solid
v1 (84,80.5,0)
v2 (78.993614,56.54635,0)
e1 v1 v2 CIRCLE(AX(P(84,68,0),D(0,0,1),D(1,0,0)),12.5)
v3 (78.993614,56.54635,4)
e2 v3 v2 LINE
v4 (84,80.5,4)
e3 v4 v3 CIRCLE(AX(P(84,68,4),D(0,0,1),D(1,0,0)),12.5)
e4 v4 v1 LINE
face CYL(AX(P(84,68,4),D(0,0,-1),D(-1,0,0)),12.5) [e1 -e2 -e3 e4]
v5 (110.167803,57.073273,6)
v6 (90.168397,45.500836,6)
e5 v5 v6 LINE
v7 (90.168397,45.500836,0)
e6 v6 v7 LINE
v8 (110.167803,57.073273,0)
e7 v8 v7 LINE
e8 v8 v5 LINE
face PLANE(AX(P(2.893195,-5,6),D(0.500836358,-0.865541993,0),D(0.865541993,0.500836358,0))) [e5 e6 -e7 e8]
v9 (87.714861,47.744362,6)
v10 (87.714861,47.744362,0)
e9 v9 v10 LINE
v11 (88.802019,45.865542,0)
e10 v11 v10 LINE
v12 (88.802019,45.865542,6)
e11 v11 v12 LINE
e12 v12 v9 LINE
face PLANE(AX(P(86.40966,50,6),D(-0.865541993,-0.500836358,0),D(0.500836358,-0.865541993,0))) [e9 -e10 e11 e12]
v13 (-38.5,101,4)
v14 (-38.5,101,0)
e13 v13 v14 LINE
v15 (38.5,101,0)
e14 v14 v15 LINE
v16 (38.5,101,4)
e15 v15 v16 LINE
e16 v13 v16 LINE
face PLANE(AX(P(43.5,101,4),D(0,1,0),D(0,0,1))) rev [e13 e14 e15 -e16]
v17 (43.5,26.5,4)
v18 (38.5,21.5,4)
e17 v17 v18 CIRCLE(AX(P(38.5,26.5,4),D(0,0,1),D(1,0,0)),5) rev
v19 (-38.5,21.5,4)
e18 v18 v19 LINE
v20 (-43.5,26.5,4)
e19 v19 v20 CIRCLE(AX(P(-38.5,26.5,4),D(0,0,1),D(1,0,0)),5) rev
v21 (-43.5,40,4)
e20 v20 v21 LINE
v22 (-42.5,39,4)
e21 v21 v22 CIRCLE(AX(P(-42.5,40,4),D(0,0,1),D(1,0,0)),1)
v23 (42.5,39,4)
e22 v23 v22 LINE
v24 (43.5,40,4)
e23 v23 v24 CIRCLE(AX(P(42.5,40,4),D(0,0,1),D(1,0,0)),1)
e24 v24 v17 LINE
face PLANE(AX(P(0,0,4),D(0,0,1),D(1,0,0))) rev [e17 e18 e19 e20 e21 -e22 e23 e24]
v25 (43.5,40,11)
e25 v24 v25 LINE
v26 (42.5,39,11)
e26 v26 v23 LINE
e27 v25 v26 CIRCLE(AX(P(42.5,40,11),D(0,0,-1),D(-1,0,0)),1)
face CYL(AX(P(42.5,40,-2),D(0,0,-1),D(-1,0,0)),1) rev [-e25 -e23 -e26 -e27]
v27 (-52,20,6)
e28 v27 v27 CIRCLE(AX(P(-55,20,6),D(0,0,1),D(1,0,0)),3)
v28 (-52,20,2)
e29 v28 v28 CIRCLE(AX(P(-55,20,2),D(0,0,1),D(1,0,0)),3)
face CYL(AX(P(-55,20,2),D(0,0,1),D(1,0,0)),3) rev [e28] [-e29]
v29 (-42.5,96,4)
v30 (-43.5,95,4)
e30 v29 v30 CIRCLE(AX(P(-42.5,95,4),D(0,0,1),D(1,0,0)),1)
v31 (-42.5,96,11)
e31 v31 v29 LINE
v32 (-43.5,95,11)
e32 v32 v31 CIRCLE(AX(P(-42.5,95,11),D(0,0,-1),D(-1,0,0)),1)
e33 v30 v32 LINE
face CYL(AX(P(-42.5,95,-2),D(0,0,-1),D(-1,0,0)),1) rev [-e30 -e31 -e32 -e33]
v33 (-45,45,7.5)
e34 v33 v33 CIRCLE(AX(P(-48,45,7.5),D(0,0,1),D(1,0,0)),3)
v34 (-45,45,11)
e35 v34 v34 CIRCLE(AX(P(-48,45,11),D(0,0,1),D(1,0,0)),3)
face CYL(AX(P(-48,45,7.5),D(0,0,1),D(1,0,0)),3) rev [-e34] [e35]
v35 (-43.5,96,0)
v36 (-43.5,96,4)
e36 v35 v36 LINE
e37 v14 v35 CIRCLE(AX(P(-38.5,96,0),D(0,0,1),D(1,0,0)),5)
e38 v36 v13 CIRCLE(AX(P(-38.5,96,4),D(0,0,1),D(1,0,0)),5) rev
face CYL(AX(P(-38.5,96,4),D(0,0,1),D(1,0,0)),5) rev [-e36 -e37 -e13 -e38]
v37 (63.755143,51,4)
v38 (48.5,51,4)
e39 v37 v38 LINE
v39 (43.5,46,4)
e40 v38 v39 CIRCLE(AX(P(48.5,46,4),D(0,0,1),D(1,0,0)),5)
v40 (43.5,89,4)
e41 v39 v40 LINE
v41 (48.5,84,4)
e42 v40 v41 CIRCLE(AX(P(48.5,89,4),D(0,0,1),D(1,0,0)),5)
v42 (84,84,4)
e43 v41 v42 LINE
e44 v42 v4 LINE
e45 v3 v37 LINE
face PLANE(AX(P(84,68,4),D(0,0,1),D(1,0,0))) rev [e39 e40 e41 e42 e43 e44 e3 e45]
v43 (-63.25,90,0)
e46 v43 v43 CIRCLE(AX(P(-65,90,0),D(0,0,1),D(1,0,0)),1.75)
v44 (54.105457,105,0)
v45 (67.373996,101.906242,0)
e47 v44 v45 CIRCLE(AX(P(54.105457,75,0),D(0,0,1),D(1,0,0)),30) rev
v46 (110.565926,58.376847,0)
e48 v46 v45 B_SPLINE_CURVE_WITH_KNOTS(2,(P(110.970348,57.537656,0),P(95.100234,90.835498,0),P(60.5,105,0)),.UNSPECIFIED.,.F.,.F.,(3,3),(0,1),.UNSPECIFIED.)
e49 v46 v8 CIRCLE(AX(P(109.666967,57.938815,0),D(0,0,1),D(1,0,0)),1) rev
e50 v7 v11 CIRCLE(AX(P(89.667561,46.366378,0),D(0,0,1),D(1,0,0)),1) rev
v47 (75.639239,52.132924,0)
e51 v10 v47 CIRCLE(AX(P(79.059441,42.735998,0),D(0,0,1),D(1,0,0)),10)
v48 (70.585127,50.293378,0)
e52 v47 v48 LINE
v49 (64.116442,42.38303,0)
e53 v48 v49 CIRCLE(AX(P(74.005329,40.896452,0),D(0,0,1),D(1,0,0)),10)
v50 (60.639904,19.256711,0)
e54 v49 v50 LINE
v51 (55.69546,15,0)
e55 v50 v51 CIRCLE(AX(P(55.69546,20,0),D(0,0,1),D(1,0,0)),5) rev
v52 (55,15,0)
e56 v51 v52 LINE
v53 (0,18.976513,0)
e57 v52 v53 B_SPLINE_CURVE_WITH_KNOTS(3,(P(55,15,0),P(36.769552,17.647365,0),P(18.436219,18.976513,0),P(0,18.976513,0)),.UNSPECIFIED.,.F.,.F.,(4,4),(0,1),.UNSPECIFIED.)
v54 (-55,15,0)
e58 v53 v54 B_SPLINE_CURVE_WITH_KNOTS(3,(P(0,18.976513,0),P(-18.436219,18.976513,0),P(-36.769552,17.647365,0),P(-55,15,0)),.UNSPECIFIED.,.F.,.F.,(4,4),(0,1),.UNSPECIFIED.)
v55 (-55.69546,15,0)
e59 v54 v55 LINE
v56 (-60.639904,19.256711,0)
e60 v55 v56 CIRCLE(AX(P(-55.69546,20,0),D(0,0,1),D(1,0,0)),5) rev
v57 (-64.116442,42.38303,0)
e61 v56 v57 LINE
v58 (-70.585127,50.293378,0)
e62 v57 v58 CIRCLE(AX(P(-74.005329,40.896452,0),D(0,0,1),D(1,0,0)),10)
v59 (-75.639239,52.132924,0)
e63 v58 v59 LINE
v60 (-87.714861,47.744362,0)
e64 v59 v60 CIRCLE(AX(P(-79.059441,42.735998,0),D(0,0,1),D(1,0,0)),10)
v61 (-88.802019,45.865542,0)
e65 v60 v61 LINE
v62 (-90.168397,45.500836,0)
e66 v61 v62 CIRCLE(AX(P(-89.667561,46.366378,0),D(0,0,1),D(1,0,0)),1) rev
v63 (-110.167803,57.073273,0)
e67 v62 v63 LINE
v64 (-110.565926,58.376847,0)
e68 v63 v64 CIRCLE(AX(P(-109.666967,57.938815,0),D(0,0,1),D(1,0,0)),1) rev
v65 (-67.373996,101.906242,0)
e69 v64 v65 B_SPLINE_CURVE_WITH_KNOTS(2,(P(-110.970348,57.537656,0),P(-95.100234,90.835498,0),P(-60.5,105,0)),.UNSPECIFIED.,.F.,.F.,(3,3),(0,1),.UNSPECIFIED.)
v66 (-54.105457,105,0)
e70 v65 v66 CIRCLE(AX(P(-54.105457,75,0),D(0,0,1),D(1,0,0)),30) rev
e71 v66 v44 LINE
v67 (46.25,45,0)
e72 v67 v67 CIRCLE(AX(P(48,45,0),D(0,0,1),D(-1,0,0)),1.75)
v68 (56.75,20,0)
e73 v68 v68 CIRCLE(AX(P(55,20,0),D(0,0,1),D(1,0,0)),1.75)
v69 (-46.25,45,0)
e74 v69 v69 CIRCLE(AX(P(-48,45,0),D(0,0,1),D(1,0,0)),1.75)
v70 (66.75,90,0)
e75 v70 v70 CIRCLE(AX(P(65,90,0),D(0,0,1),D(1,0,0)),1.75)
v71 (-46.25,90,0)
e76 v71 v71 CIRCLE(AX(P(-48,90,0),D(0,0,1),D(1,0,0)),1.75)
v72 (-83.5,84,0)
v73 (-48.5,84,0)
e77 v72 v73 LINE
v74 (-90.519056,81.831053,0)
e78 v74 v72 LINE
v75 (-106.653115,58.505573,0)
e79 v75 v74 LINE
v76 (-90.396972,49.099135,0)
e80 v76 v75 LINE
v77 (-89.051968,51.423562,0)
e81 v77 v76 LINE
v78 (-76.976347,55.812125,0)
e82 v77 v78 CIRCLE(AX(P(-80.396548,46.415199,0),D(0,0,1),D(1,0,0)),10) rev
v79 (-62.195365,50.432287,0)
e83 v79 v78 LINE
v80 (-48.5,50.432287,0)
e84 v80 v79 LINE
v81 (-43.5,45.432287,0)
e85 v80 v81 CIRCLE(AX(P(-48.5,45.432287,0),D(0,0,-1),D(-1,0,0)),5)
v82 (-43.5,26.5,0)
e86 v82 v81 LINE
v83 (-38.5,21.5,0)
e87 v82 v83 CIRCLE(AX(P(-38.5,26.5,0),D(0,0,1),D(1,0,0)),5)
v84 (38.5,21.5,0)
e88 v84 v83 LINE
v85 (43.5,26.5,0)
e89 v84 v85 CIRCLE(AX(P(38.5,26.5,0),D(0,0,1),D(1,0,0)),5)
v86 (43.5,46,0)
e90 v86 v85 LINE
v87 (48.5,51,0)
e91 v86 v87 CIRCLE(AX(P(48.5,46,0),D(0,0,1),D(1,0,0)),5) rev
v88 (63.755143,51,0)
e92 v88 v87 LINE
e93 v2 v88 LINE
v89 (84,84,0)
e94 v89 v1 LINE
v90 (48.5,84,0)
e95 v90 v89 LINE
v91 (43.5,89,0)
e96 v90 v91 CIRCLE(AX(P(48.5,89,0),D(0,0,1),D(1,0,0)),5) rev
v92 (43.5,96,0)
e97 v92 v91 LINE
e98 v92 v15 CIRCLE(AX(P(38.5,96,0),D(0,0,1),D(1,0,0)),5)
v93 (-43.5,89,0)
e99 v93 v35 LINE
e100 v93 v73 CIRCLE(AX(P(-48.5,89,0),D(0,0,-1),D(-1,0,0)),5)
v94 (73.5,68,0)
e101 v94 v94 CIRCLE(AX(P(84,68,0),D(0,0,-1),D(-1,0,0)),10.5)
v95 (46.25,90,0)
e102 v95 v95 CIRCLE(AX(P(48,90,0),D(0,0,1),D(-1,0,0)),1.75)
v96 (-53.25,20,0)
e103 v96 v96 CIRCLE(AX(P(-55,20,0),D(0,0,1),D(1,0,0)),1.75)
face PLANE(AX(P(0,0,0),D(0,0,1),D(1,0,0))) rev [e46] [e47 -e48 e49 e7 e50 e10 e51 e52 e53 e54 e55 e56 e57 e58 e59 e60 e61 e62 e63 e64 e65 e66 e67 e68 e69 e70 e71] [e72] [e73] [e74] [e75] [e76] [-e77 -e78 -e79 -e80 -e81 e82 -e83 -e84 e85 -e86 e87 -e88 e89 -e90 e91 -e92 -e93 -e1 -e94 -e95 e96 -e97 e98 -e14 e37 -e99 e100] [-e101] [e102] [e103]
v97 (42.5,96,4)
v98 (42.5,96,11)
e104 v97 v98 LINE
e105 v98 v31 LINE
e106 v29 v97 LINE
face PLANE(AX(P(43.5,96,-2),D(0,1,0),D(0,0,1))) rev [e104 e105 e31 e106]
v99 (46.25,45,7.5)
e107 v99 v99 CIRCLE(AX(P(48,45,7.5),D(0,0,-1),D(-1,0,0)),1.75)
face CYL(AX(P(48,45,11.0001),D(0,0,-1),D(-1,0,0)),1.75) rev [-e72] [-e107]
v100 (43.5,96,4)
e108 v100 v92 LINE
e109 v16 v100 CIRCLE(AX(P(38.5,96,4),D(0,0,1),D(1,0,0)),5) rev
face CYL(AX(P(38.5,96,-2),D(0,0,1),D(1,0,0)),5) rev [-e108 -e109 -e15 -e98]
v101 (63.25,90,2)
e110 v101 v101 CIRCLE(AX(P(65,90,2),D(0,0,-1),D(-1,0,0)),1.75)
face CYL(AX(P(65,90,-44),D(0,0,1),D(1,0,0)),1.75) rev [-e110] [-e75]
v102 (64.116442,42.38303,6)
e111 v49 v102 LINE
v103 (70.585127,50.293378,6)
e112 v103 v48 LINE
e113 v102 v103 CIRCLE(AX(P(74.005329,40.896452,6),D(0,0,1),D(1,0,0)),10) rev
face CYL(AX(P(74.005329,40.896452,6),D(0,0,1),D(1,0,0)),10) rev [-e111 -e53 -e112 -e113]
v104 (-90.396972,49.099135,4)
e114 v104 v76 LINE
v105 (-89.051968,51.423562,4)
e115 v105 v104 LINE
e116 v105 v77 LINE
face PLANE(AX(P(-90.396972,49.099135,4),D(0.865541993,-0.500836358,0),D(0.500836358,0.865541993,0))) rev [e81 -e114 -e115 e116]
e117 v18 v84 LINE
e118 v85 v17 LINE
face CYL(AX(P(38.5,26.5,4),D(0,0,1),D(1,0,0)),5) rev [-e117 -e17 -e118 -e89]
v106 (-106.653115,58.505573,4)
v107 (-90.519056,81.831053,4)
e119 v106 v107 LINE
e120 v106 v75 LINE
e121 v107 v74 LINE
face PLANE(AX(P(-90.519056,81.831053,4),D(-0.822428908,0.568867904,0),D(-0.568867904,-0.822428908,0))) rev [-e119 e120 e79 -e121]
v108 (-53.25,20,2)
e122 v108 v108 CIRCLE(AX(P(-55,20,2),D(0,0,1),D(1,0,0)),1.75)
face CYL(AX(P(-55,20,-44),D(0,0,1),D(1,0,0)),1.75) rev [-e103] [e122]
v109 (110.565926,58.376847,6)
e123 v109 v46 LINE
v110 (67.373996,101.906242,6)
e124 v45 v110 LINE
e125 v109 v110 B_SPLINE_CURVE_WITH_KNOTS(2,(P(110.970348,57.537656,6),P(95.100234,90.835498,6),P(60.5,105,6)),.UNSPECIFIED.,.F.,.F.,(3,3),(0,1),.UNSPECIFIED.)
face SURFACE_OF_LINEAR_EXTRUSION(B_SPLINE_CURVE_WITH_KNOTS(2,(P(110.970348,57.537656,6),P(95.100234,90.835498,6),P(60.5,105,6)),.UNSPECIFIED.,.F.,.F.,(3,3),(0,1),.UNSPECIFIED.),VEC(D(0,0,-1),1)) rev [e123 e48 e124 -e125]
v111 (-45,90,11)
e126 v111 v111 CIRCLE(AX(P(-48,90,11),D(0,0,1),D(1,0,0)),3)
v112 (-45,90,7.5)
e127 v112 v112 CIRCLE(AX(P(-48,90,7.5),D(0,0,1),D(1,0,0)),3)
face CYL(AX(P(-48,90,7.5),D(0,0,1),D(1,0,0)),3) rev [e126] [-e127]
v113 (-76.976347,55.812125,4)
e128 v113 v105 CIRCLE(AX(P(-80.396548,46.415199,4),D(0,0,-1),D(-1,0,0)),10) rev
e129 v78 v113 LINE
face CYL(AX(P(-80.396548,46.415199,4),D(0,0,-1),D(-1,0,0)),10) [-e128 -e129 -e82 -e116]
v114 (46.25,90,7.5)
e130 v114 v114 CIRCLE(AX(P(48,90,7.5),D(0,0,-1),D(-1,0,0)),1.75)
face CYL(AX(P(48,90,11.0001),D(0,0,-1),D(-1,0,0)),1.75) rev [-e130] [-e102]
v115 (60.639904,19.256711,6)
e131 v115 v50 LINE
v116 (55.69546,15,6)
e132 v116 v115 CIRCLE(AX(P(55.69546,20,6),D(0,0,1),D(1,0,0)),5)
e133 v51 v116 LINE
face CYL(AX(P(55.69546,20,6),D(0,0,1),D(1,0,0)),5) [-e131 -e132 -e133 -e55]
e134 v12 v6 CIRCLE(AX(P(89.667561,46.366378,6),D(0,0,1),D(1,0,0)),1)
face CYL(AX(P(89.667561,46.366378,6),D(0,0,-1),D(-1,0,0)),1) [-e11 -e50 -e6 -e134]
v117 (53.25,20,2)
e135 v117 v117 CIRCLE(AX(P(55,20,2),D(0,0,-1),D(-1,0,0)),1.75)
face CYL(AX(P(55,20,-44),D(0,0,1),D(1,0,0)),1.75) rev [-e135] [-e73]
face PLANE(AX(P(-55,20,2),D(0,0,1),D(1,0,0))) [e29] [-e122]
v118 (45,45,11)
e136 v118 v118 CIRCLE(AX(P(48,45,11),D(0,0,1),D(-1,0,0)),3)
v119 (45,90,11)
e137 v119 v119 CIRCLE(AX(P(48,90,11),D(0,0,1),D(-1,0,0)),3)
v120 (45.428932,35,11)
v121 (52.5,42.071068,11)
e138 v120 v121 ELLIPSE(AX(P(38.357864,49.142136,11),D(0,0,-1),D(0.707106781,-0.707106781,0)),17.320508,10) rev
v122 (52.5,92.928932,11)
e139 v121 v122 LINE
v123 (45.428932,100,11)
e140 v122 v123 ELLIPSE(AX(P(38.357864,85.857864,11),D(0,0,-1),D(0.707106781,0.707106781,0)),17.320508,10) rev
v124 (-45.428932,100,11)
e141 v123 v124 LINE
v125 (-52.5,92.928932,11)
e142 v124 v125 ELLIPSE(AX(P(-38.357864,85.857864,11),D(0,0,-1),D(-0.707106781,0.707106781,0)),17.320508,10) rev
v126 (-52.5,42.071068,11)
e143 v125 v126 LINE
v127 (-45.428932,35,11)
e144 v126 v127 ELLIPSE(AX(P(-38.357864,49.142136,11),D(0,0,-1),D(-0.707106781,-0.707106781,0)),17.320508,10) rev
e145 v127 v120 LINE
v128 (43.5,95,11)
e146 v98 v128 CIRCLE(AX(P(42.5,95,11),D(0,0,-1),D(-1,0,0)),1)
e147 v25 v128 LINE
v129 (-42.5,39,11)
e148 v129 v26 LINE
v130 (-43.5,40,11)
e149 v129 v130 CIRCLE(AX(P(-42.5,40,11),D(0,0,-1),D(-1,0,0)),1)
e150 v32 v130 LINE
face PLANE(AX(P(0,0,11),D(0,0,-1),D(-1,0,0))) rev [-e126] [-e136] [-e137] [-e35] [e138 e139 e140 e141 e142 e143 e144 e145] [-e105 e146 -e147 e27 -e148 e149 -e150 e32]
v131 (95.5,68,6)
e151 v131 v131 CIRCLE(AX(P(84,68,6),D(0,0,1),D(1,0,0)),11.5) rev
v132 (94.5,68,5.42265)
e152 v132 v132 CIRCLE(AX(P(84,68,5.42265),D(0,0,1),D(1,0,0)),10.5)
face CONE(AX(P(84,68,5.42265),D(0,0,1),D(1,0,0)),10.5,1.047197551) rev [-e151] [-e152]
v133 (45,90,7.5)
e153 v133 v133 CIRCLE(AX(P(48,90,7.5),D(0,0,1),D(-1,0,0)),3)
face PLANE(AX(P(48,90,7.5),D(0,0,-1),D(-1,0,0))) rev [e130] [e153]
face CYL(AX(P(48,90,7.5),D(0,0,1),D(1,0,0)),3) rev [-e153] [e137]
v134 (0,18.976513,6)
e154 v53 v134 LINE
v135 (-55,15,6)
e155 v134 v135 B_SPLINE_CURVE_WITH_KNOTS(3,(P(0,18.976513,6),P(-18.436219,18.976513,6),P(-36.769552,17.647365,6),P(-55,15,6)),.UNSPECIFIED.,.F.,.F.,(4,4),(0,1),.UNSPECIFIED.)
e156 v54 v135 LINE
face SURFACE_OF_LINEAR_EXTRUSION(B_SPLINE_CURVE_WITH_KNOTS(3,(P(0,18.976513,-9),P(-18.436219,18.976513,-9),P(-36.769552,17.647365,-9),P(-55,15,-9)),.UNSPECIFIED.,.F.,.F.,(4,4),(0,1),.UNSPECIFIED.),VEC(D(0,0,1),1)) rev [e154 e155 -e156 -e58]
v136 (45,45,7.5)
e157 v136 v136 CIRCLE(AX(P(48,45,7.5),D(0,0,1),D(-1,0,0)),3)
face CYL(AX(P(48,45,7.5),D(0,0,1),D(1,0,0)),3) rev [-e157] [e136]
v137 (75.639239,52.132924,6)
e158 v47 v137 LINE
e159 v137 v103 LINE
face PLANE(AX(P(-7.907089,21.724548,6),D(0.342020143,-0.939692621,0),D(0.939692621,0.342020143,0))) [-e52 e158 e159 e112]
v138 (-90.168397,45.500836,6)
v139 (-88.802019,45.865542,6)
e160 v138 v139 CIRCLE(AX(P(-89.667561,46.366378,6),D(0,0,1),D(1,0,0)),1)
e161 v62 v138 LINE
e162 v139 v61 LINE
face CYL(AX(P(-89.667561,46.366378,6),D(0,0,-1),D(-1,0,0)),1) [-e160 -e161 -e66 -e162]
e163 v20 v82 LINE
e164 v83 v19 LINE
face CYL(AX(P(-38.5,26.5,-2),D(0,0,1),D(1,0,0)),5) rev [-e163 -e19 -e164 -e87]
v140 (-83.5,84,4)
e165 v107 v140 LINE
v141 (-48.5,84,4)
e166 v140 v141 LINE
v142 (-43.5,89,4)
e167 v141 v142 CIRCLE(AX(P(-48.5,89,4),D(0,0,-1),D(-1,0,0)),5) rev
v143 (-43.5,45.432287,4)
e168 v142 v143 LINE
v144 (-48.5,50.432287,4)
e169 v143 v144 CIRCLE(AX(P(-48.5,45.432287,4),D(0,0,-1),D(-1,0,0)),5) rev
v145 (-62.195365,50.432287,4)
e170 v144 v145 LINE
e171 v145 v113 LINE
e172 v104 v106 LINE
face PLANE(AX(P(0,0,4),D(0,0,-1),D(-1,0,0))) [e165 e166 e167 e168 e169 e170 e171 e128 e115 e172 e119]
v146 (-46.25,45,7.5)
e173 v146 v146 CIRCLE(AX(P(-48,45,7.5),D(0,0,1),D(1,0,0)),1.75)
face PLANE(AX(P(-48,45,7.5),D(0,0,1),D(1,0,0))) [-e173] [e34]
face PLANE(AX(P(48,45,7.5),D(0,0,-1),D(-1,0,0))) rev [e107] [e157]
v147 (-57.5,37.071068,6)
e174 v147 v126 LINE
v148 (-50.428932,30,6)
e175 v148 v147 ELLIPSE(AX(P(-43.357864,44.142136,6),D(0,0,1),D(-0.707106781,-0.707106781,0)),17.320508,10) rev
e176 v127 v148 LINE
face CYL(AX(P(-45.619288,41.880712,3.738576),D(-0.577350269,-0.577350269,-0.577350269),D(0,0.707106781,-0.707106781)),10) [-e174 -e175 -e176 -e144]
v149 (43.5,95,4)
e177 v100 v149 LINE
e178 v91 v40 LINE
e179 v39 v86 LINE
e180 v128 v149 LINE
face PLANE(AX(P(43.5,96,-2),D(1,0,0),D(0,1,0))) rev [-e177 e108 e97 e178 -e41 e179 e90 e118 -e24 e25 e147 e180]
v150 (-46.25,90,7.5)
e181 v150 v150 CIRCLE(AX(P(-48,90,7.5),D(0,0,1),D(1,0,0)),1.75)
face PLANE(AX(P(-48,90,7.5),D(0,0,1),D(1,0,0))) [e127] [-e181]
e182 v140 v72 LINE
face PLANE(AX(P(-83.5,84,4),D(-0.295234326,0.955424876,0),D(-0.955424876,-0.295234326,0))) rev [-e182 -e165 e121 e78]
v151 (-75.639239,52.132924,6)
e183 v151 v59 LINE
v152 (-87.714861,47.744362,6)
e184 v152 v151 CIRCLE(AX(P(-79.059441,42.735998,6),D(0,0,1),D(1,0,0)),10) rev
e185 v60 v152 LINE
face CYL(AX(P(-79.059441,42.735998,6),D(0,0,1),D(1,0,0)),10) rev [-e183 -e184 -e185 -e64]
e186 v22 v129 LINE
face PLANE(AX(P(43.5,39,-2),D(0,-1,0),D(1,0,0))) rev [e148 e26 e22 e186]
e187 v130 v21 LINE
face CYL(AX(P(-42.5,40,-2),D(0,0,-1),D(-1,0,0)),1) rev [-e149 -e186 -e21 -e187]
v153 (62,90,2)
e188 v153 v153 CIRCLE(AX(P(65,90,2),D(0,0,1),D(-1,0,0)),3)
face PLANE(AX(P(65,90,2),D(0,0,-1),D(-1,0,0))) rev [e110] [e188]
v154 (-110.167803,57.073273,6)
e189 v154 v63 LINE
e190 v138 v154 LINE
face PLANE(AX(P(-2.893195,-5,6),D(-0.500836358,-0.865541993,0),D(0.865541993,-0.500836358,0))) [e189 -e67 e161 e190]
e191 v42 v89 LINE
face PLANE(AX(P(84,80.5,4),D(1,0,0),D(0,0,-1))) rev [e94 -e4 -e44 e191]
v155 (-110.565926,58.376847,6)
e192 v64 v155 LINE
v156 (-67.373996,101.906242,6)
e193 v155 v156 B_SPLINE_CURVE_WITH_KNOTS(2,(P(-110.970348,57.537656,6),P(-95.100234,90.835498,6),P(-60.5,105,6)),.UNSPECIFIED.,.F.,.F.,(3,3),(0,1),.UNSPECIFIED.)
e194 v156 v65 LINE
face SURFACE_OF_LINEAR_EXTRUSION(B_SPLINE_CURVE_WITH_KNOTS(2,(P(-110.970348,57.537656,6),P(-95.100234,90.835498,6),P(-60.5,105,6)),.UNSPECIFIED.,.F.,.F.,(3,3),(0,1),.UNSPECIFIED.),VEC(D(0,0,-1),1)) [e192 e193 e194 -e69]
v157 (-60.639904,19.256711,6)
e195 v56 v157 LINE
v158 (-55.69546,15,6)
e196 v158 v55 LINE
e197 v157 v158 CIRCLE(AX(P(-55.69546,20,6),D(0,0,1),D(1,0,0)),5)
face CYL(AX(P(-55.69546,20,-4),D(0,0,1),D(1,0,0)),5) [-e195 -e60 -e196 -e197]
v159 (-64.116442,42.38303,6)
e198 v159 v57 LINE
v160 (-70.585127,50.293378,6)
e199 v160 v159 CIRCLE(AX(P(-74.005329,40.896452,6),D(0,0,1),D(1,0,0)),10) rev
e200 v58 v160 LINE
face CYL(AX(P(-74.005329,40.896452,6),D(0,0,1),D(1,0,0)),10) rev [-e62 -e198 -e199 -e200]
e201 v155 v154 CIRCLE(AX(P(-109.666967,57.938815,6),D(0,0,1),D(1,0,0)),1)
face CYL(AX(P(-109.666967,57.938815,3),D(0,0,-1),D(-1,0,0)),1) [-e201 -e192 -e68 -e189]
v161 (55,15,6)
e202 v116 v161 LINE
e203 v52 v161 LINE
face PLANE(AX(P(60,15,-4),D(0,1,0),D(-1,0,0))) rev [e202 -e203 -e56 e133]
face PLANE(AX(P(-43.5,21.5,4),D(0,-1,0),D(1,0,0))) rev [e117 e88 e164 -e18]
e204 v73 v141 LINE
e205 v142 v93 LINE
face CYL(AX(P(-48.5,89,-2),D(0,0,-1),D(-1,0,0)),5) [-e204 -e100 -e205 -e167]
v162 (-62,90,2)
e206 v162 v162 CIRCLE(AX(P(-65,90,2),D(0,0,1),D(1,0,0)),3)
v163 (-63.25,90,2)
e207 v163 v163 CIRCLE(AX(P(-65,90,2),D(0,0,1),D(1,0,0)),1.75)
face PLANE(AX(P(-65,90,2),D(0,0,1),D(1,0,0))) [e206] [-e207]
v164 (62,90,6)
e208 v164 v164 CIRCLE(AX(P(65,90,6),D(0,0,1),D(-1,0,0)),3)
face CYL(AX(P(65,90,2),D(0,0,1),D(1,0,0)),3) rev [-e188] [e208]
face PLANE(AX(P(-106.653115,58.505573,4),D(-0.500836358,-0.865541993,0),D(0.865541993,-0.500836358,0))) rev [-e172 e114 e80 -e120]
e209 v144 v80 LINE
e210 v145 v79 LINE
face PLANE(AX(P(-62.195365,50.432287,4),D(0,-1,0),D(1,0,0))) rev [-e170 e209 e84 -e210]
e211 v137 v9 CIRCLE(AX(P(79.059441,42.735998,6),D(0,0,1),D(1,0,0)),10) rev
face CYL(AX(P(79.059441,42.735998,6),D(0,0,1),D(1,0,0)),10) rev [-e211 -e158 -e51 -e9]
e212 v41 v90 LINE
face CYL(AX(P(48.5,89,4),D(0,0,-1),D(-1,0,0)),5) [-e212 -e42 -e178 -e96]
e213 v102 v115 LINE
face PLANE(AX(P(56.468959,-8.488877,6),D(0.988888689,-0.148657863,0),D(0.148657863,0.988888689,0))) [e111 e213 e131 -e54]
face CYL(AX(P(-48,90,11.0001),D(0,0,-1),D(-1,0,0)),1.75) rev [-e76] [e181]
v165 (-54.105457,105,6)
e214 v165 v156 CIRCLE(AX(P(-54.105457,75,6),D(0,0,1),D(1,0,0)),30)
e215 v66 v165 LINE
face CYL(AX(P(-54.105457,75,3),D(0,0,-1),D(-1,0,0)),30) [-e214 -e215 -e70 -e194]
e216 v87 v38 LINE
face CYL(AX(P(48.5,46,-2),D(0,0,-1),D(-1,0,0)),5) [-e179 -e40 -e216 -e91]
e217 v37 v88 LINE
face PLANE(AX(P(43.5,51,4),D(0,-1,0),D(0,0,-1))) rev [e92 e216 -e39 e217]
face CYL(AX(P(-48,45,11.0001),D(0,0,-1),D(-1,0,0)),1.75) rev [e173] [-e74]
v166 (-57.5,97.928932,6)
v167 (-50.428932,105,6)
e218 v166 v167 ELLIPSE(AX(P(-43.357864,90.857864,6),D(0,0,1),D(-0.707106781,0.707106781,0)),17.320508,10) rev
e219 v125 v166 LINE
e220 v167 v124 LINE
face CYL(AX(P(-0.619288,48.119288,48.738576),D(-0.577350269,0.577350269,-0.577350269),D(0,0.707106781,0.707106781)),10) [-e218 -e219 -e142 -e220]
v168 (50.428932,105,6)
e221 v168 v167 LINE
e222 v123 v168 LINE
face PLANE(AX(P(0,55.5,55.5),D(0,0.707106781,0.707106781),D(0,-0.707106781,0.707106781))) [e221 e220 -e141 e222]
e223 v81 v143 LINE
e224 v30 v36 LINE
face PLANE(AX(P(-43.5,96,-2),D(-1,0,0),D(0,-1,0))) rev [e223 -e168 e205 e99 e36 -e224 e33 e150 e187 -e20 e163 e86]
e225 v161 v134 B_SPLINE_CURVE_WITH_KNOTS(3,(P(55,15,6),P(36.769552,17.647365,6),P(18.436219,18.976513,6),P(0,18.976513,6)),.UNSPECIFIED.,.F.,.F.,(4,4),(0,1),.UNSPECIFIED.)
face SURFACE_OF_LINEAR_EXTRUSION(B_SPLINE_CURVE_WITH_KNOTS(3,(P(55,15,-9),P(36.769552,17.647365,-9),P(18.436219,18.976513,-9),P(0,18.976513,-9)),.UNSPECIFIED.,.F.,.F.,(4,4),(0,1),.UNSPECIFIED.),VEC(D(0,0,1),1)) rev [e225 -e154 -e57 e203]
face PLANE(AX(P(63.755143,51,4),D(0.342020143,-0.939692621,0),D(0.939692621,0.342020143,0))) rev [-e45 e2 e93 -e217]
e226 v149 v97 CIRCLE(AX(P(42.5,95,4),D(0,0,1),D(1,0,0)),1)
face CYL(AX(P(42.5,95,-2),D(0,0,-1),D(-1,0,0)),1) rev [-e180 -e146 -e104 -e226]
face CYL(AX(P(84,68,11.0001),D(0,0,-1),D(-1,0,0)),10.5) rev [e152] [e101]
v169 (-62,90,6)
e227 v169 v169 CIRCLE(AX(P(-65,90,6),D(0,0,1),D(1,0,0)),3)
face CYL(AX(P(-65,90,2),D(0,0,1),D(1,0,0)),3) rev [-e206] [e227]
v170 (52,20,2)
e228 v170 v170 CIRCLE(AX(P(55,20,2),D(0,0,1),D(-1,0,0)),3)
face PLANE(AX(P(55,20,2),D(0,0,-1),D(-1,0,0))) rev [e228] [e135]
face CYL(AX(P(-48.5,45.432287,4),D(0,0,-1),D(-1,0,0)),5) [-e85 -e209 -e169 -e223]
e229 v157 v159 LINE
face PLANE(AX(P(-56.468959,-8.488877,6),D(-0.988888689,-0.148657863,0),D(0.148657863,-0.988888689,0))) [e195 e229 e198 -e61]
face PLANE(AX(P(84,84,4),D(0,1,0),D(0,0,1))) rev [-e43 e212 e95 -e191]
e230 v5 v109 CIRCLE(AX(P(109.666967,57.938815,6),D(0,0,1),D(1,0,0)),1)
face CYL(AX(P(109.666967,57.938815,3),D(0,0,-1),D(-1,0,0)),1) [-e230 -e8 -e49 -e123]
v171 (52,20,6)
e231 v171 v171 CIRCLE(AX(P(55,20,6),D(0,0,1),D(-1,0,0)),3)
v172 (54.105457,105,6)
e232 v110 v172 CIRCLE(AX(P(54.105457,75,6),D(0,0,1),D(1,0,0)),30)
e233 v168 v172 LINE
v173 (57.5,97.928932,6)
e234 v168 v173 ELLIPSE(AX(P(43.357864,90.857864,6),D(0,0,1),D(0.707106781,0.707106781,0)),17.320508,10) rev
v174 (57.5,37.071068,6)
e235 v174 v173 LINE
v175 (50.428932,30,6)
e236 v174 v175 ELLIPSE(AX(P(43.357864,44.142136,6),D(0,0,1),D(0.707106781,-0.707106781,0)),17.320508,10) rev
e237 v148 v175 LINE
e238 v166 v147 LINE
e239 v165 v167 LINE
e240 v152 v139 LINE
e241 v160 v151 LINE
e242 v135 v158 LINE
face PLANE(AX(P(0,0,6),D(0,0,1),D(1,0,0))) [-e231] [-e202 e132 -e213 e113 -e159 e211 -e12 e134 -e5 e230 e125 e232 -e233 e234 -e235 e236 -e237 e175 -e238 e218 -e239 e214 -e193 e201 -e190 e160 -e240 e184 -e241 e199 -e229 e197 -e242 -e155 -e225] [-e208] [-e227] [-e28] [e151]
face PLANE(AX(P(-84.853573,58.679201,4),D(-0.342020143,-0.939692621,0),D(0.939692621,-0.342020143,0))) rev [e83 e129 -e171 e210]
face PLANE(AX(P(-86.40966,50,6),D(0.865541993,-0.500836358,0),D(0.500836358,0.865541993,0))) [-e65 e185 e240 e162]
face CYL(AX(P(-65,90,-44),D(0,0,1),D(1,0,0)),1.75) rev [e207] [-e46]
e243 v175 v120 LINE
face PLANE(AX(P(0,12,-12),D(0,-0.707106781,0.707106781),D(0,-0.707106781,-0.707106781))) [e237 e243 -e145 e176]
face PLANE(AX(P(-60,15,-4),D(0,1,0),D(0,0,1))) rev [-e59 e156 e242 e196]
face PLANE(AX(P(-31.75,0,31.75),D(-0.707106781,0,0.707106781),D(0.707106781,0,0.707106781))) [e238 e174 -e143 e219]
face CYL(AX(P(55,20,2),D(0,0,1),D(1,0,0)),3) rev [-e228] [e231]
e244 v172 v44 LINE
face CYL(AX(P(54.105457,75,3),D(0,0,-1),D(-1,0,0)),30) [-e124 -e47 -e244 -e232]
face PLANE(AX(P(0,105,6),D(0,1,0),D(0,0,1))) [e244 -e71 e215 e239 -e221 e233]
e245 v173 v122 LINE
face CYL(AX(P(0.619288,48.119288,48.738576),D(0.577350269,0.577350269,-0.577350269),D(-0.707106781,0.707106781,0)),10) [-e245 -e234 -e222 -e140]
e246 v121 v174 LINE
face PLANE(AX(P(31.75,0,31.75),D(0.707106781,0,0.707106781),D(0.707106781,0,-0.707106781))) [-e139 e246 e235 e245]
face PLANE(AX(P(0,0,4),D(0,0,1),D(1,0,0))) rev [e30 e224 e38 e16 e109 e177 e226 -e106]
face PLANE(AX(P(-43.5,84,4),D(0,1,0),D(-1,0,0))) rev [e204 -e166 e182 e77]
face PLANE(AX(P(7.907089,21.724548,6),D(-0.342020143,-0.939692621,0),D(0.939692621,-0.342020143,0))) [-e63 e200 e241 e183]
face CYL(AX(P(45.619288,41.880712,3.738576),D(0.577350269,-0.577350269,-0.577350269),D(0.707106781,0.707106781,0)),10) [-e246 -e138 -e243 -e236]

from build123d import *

# Parameters (mm, degrees)
SKETCH_8_W           = 105
SKETCH_8_H           = 70
EXTRUDE_1_DEPTH      = 6
EXTRUDE_2_DEPTH      = 7
EXTRUDE_2_DEPTH_BACK = 2
SKETCH_12_W          = 109
SKETCH_12_H          = 74
SKETCH_12_W_2        = 85
SKETCH_12_H_2        = 55
CUT_EXTRUDE_1_DEPTH  = 7
CUT_EXTRUDE_2_DEPTH  = 7
SKETCH_14_R          = 1.75
CUT_EXTRUDE_4_DEPTH  = 100
SKETCH_16_R          = 3
CUT_EXTRUDE_5_DEPTH  = 3.5
SKETCH_17_W          = 9
SKETCH_17_H          = 8
CUT_EXTRUDE_6_DEPTH  = 3
SKETCH_18_R          = 2.6
CUT_EXTRUDE_7_DEPTH  = 3
SKETCH_25_W          = 1
SKETCH_25_H          = 8
CUT_EXTRUDE_14_DEPTH = 7
SKETCH_26_W          = 87
SKETCH_26_H          = 57
CUT_EXTRUDE_15_DEPTH = 7
EXTRUDE_3_DEPTH      = 6
SKETCH_30_R          = 3
CUT_EXTRUDE_16_DEPTH = 4
SKETCH_31_R          = 1.75
CUT_EXTRUDE_17_DEPTH = 50
CUT_EXTRUDE_18_DEPTH = 10
SKETCH_38_W          = 306.867887418
SKETCH_38_H          = 124.183206552
CUT_EXTRUDE_19_DEPTH = 10
SKETCH_39_W          = 105
SKETCH_39_H          = 70
EXTRUDE_4_DEPTH      = 8
FILLET_1_R           = 10
SKETCH_44_W          = 87
SKETCH_44_H          = 57
CUT_EXTRUDE_21_DEPTH = 154.324551706
SKETCH_45_R          = 1.75
CUT_EXTRUDE_23_DEPTH = 154.167941026
SKETCH_46_R          = 3
CUT_EXTRUDE_24_DEPTH = 3.5
SKETCH_47_R          = 10.5
CUT_EXTRUDE_25_DEPTH = 154.167941026
CUT_EXTRUDE_26_DEPTH = 4
CUT_EXTRUDE_27_DEPTH = 4
FILLET_2_R           = 30
FILLET_3_R           = 10
FILLET_4_R           = 1
FILLET_5_R           = 5
FILLET_7_R           = 1
FILLET_8_R           = 10
CUT_EXTRUDE_28_DEPTH = 15
SKETCH_55_W          = 151.974091765
SKETCH_55_H          = 109.196199268
CUT_EXTRUDE_29_DEPTH = 10
CHAMFER_1_SIZE       = 1
CHAMFER_1_SIZE2      = 0.577350269


with BuildPart() as part:
    # ｽｹｯﾁ8 → ﾎﾞｽ - 押し出し1 (new body)
    with BuildSketch(Plane.XY):
        with BuildLine():
            Line((-60, 15), (-65, 48.260557735))
            Line((-65, 48.260557735), (-83.516465442, 55))
            Line((-83.516465442, 55), (-89.302855497, 45))
            Line((-89.302855497, 45), (-110.970347899, 57.537656255))
            add(Edge.make_bspline(
                [(-110.970347899, 57.537656255), (-95.100233904, 90.835498348), (-60.5, 105)],
                knots=[0, 0, 0, 1, 1, 1], degree=2))
            Line((-60.5, 105), (60.5, 105))
            add(Edge.make_bspline(
                [(110.970347899, 57.537656255), (95.100233904, 90.835498348), (60.5, 105)],
                knots=[0, 0, 0, 1, 1, 1], degree=2))
            Line((110.970347899, 57.537656255), (89.302855497, 45))
            Line((89.302855497, 45), (83.516465442, 55))
            Line((83.516465442, 55), (65, 48.260557735))
            Line((65, 48.260557735), (60, 15))
            Line((60, 15), (30, 10))
            Line((30, 10), (26.650635095, 10))
            Line((26.650635095, 10), (26.650635095, 12.5))
            ThreePointArc((26.650635095, 12.5), (21.650635095, 17.5), (16.650635095, 12.5))
            Line((16.650635095, 12.5), (16.650635095, 10))
            Line((16.650635095, 10), (-16.650635095, 10))
            Line((-16.650635095, 10), (-16.650635095, 12.5))
            ThreePointArc((-16.650635095, 12.5), (-21.650635095, 17.5), (-26.650635095, 12.5))
            Line((-26.650635095, 12.5), (-26.650635095, 10))
            Line((-26.650635095, 10), (-30, 10))
            Line((-30, 10), (-60, 15))
        make_face()
        with Locations((0, 63)):
            Rectangle(SKETCH_8_W, SKETCH_8_H, mode=Mode.SUBTRACT)
    extrude(amount=EXTRUDE_1_DEPTH)

    # ｽｹｯﾁ12 → ﾎﾞｽ - 押し出し2 (add, two sides: drawn at the far end of the back side and taken through both)
    with BuildSketch(Plane.XY.offset(6).offset(-EXTRUDE_2_DEPTH_BACK)):
        with Locations((0, 63)):
            Rectangle(SKETCH_12_W, SKETCH_12_H)
        with Locations((0, 67.5)):
            Rectangle(SKETCH_12_W_2, SKETCH_12_H_2, mode=Mode.SUBTRACT)
    extrude(amount=EXTRUDE_2_DEPTH + EXTRUDE_2_DEPTH_BACK)

    # ｽｹｯﾁ13 → ｶｯﾄ - 押し出し1 (cut)
    with BuildSketch(Plane.XY.offset(13)):
        Polygon((-58.5, 77.039073902), (-58.5, 25.039073902), (-48.5, 25.039073902), (-48.5, 65.121537976), align=None)
        Polygon((58.5, 77.039073902), (58.5, 25.039073902), (48.5, 25.039073902), (48.5, 65.121537976), align=None)
    extrude(amount=-CUT_EXTRUDE_1_DEPTH, mode=Mode.SUBTRACT)

    # ｽｹｯﾁ15 → ｶｯﾄ - 押し出し2 (cut)
    with BuildSketch(Plane(origin=(0, 0, 4), x_dir=(-1, 0, 0), z_dir=(0, 0, -1))):
        Polygon((-52.5, 80), (-43.5, 80), (-43.5, 72), (-51.660900369, 72), (-46.5, 65.849478444), (-46.5, 28), (46.5, 28), (46.5, 65.849478444), (51.660900369, 72), (42.5, 72), (42.5, 80), (52.5, 80), (52.5, 98), (-52.5, 98), align=None)
    extrude(amount=-CUT_EXTRUDE_2_DEPTH, mode=Mode.SUBTRACT)

    # ｽｹｯﾁ14 → ｶｯﾄ - 押し出し4 (cut)
    with BuildSketch(Plane.XY):
        with Locations((48.5, 76)):
            Circle(SKETCH_14_R)
        with Locations((-48.5, 76)):
            Circle(SKETCH_14_R)
    extrude(amount=CUT_EXTRUDE_4_DEPTH, mode=Mode.SUBTRACT)

    # ｽｹｯﾁ16 → ｶｯﾄ - 押し出し5 (cut)
    with BuildSketch(Plane.XY.offset(13)):
        with Locations((48.5, 76)):
            Circle(SKETCH_16_R)
        with Locations((-48.5, 76)):
            Circle(SKETCH_16_R)
    extrude(amount=-CUT_EXTRUDE_5_DEPTH, mode=Mode.SUBTRACT)

    # ｽｹｯﾁ17 → ｶｯﾄ - 押し出し6 (cut)
    with BuildSketch(Plane(origin=(0, 0, 4), x_dir=(-1, 0, 0), z_dir=(0, 0, -1))):
        with Locations((-48, 76)):
            Rectangle(SKETCH_17_W, SKETCH_17_H)
        with Locations((48, 76)):
            Rectangle(SKETCH_17_W, SKETCH_17_H)
    extrude(amount=-CUT_EXTRUDE_6_DEPTH, mode=Mode.SUBTRACT)

    # ｽｹｯﾁ18 → ｶｯﾄ - 押し出し7 (cut)
    with BuildSketch(Plane(origin=(0, 0, 11), x_dir=(-1, 0, 0), z_dir=(0, 0, -1))):
        with Locations((-41.25, 92)):
            Circle(SKETCH_18_R)
        with Locations((-33.75, 92)):
            Circle(SKETCH_18_R)
        with Locations((-26.25, 92)):
            Circle(SKETCH_18_R)
        with Locations((-18.75, 92)):
            Circle(SKETCH_18_R)
        with Locations((-11.25, 92)):
            Circle(SKETCH_18_R)
        with Locations((-3.75, 92)):
            Circle(SKETCH_18_R)
        with Locations((3.75, 92)):
            Circle(SKETCH_18_R)
        with Locations((11.25, 92)):
            Circle(SKETCH_18_R)
        with Locations((18.75, 92)):
            Circle(SKETCH_18_R)
        with Locations((26.25, 92)):
            Circle(SKETCH_18_R)
        with Locations((33.75, 92)):
            Circle(SKETCH_18_R)
        with Locations((41.25, 92)):
            Circle(SKETCH_18_R)
    extrude(amount=-CUT_EXTRUDE_7_DEPTH, mode=Mode.SUBTRACT)

    # ｽｹｯﾁ25 → ｶｯﾄ - 押し出し14 (cut)
    with BuildSketch(Plane(origin=(0, 0, 4), x_dir=(-1, 0, 0), z_dir=(0, 0, -1))):
        with Locations((43, 76)):
            Rectangle(SKETCH_25_W, SKETCH_25_H)
    extrude(amount=-CUT_EXTRUDE_14_DEPTH, mode=Mode.SUBTRACT)

    # ｽｹｯﾁ26 → ｶｯﾄ - 押し出し15 (cut)
    with BuildSketch(Plane.XY.offset(13)):
        with Locations((0, 67.5)):
            Rectangle(SKETCH_26_W, SKETCH_26_H)
    extrude(amount=-CUT_EXTRUDE_15_DEPTH, mode=Mode.SUBTRACT)

    # ｽｹｯﾁ27 → ﾎﾞｽ - 押し出し3 (add)
    with BuildSketch(Plane(origin=(0, 0, 4), x_dir=(-1, 0, 0), z_dir=(0, 0, -1))):
        Polygon((-52.5, 72), (-51.660900369, 72), (-46.5, 65.849478444), (-46.5, 28), (-52.5, 28), align=None)
        Polygon((46.5, 28), (52.5, 28), (52.5, 72), (51.660900369, 72), (46.5, 65.849478444), align=None)
    extrude(amount=EXTRUDE_3_DEPTH)

    # ｽｹｯﾁ30 → ｶｯﾄ - 押し出し16 (cut)
    with BuildSketch(Plane.XY.offset(6)):
        with Locations((-65, 90)):
            Circle(SKETCH_30_R)
        with Locations((-55, 20)):
            Circle(SKETCH_30_R)
        with Locations(Location((55, 20, 0), (0, 0, 180))):
            Circle(SKETCH_30_R)
        with Locations(Location((65, 90, 0), (0, 0, 180))):
            Circle(SKETCH_30_R)
    extrude(amount=-CUT_EXTRUDE_16_DEPTH, mode=Mode.SUBTRACT)

    # ｽｹｯﾁ31 → ｶｯﾄ - 押し出し17 (cut)
    with BuildSketch(Plane.XY.offset(6)):
        with Locations((-65, 90)):
            Circle(SKETCH_31_R)
        with Locations((-55, 20)):
            Circle(SKETCH_31_R)
        with Locations((55, 20)):
            Circle(SKETCH_31_R)
        with Locations((65, 90)):
            Circle(SKETCH_31_R)
    extrude(amount=-CUT_EXTRUDE_17_DEPTH, mode=Mode.SUBTRACT)

    # ｽｹｯﾁ37 → ｶｯﾄ - 押し出し18 (cut)
    with BuildSketch(Plane.XY.offset(6)):
        Polygon((-60, 15), (-30, 15), (-28.556624327, 17.5), (28.556624327, 17.5), (30, 15), (60, 15), (60, 0), (-60, 0), align=None)
    extrude(amount=-CUT_EXTRUDE_18_DEPTH, mode=Mode.SUBTRACT)

    # ｽｹｯﾁ38 → ｶｯﾄ - 押し出し19 (cut)
    with BuildSketch(Plane.XY.offset(6)):
        with Locations((0, 67.5)):
            Rectangle(SKETCH_38_W, SKETCH_38_H)
    extrude(amount=CUT_EXTRUDE_19_DEPTH, mode=Mode.SUBTRACT)

    # ｽｹｯﾁ39 → ﾎﾞｽ - 押し出し4 (add)
    with BuildSketch(Plane.XY.offset(6)):
        with Locations((0, 63)):
            Rectangle(SKETCH_39_W, SKETCH_39_H)
    extrude(amount=-EXTRUDE_4_DEPTH)

    # ｽｹｯﾁ43 → ﾛﾌﾄ1 section 0
    with BuildSketch(Plane.XY.offset(11)):
        with BuildLine():
            Line((52.5, 100), (-52.5, 100))
            Line((-52.5, 100), (-52.5, 35))
            Line((-52.5, 35), (52.5, 35))
            Line((52.5, 35), (52.5, 100))
        make_face()
    # ｽｹｯﾁ42 → ﾛﾌﾄ1 section 1
    with BuildSketch(Plane.XY.offset(6)):
        with BuildLine():
            Line((-57.5, 105), (57.5, 105))
            Line((57.5, 105), (57.5, 30))
            Line((57.5, 30), (-57.5, 30))
            Line((-57.5, 30), (-57.5, 105))
        make_face()
    loft()

    # ﾌｨﾚｯﾄ1
    fillet_1_edges = [part.edges().sort_by_distance(p)[0] for p in [
        (-55, 32.5, 8.5),
        (55, 32.5, 8.5),
        (55, 102.5, 8.5),
        (-55, 102.5, 8.5),
    ]]
    fillet(fillet_1_edges, radius=FILLET_1_R)

    # ｽｹｯﾁ44 → ｶｯﾄ - 押し出し21 (cut, through all)
    with BuildSketch(Plane.XY.offset(11)):
        with Locations((0, 67.5)):
            Rectangle(SKETCH_44_W, SKETCH_44_H)
    extrude(amount=-CUT_EXTRUDE_21_DEPTH, mode=Mode.SUBTRACT)

    # ｽｹｯﾁ45 → ｶｯﾄ - 押し出し23 (cut, through all)
    with BuildSketch(Plane.XY):
        with Locations(Location((-48, 90, 0), (0, 0, 180))):
            Circle(SKETCH_45_R)
        with Locations(Location((-48, 45, 0), (0, 0, 180))):
            Circle(SKETCH_45_R)
        with Locations(Location((48, 45, 0), (0, 0, 180))):
            Circle(SKETCH_45_R)
        with Locations(Location((48, 90, 0), (0, 0, 180))):
            Circle(SKETCH_45_R)
    extrude(amount=CUT_EXTRUDE_23_DEPTH, mode=Mode.SUBTRACT)

    # ｽｹｯﾁ46 → ｶｯﾄ - 押し出し24 (cut)
    with BuildSketch(Plane.XY.offset(11)):
        with Locations((-48, 90)):
            Circle(SKETCH_46_R)
        with Locations((-48, 45)):
            Circle(SKETCH_46_R)
        with Locations(Location((48, 45, 0), (0, 0, 180))):
            Circle(SKETCH_46_R)
        with Locations(Location((48, 90, 0), (0, 0, 180))):
            Circle(SKETCH_46_R)
    extrude(amount=-CUT_EXTRUDE_24_DEPTH, mode=Mode.SUBTRACT)

    # ｽｹｯﾁ47 → ｶｯﾄ - 押し出し25 (cut, through all)
    with BuildSketch(Plane(origin=(0, 0, 0), x_dir=(-1, 0, 0), z_dir=(0, 0, -1))):
        with Locations((-84, 68)):
            Circle(SKETCH_47_R)
    extrude(amount=-CUT_EXTRUDE_25_DEPTH, mode=Mode.SUBTRACT)

    # ｽｹｯﾁ48 → ｶｯﾄ - 押し出し26 (cut)
    with BuildSketch(Plane(origin=(0, 0, 0), x_dir=(-1, 0, 0), z_dir=(0, 0, -1))):
        with BuildLine():
            Line((-84, 80.5), (-84, 84))
            Line((-84, 84), (-43.5, 84))
            Line((-43.5, 84), (-43.5, 51))
            Line((-43.5, 51), (-63.755142564, 51))
            Line((-63.755142564, 51), (-78.993613928, 56.546349992))
            ThreePointArc((-78.993613928, 56.546349992), (-71.764383442, 70.557281262), (-84, 80.5))
        make_face()
        Polygon((43.5, 84), (83.5, 84), (90.519056293, 81.831052544), (106.6531152, 58.505573356), (90.396972403, 49.099135055), (84.853572805, 58.679200597), (62.195364621, 50.432287257), (57.5, 50.432287257), (43.5, 50.432287257), align=None)
    extrude(amount=-CUT_EXTRUDE_26_DEPTH, mode=Mode.SUBTRACT)

    # ｽｹｯﾁ49 → ｶｯﾄ - 押し出し27 (cut)
    with BuildSketch(Plane(origin=(0, 0, 0), x_dir=(-1, 0, 0), z_dir=(0, 0, -1))):
        Polygon((-43.5, 96), (-43.5, 101), (43.5, 101), (43.5, 21.5), (-43.5, 21.5), align=None)
    extrude(amount=-CUT_EXTRUDE_27_DEPTH, mode=Mode.SUBTRACT)

    # ﾌｨﾚｯﾄ2
    fillet_2_edges = [part.edges().sort_by_distance(p)[0] for p in [
        (60.5, 105, 3),
        (-60.5, 105, 3),
    ]]
    fillet(fillet_2_edges, radius=FILLET_2_R)

    # ﾌｨﾚｯﾄ3
    fillet_3_edges = [part.edges().sort_by_distance(p)[0] for p in [
        (83.516465442, 55, 3),
        (65, 48.260557735, 3),
        (-65, 48.260557735, 3),
        (-83.516465442, 55, 3),
    ]]
    fillet(fillet_3_edges, radius=FILLET_3_R)

    # ﾌｨﾚｯﾄ4
    fillet_4_edges = [part.edges().sort_by_distance(p)[0] for p in [
        (110.970347899, 57.537656255, 3),
        (89.302855497, 45, 3),
        (-89.302855497, 45, 3),
        (-110.970347899, 57.537656255, 3),
        (43.5, 96, 7.5),
        (43.5, 39, 7.5),
        (-43.5, 39, 7.5),
        (-43.5, 96, 7.5),
    ]]
    fillet(fillet_4_edges, radius=FILLET_4_R)

    # ﾌｨﾚｯﾄ5
    # the kernel refuses this fillet: 5 mm, written as the material it adds along each edge
    with BuildSketch(Plane(origin=(43.5, 21.5, 0), x_dir=(-1, 0, 0), z_dir=(0, 0, 1)), Plane(origin=(-43.5, 101, 0), x_dir=(1, 0, 0), z_dir=(0, 0, 1)), Plane(origin=(-43.5, 21.5, 0), x_dir=(0, 1, 0), z_dir=(0, 0, 1))) as fillet_5_piece_1:
        with BuildLine():
            CenterArc((FILLET_5_R, -FILLET_5_R), FILLET_5_R, 90, 90)
            Line((0, -FILLET_5_R), (0, 0))
            Line((0, 0), (FILLET_5_R, 0))
        make_face()
    extrude(amount=4)
    with BuildSketch(Plane(origin=(43.5, 101, 0), x_dir=(-1, 0, 0), z_dir=(0, 0, 1))) as fillet_5_piece_2:
        with BuildLine():
            CenterArc((FILLET_5_R, FILLET_5_R), FILLET_5_R, 180, 90)
            Line((0, FILLET_5_R), (0, 0))
            Line((0, 0), (FILLET_5_R, 0))
        make_face()
    extrude(amount=4)
    # the kernel refuses this fillet: 5 mm, written as the material it takes off along each edge
    with BuildSketch(Plane(origin=(60, 15, -10.761349406), x_dir=(-1, 0, 0), z_dir=(0, 0, 1)), Plane(origin=(-60, 15, -10.761349406), x_dir=(-0.1486578633311447, 0.9888886892212988, 0), z_dir=(0, 0, 1))) as fillet_5_2_piece_1:
        with BuildLine():
            CenterArc((FILLET_5_R * 0.860907952481, -FILLET_5_R), FILLET_5_R, 90, 81.450844213)
            Line((-FILLET_5_R * 0.127980736741, -FILLET_5_R * 0.851342136669), (0, 0))
            Line((0, 0), (FILLET_5_R * 0.860907952481, 0))
        make_face()
    extrude(amount=27.522698812, mode=Mode.SUBTRACT)
    with BuildSketch(Plane(origin=(43.5, 84, 0), x_dir=(0, 1, 0), z_dir=(0, 0, 1)), Plane(origin=(43.5, 51, 0), x_dir=(1, 0, 0), z_dir=(0, 0, 1)), Plane(origin=(-43.5, 50.432287257, 0), x_dir=(0, -1, 0), z_dir=(0, 0, 1))) as fillet_5_2_piece_2:
        with BuildLine():
            CenterArc((FILLET_5_R, -FILLET_5_R), FILLET_5_R, 90, 90)
            Line((0, -FILLET_5_R), (0, 0))
            Line((0, 0), (FILLET_5_R, 0))
        make_face()
    extrude(amount=4, mode=Mode.SUBTRACT)
    with BuildSketch(Plane(origin=(-43.5, 84, 0), x_dir=(0, 1, 0), z_dir=(0, 0, 1))) as fillet_5_2_piece_3:
        with BuildLine():
            CenterArc((FILLET_5_R, FILLET_5_R), FILLET_5_R, 180, 90)
            Line((0, FILLET_5_R), (0, 0))
            Line((0, 0), (FILLET_5_R, 0))
        make_face()
    extrude(amount=4, mode=Mode.SUBTRACT)

    # ﾌｨﾚｯﾄ7
    fillet_7_edges = [part.edges().sort_by_distance(p)[0] for p in [
        (-30, 15, 3),
        (-28.556624327, 17.5, 3),
        (28.556624327, 17.5, 3),
        (30, 15, 3),
    ]]
    fillet(fillet_7_edges, radius=FILLET_7_R)

    # ﾌｨﾚｯﾄ8
    fillet_8_edges = [part.edges().sort_by_distance(p)[0] for p in [
        (-84.853572805, 58.679200597, 2),
    ]]
    fillet(fillet_8_edges, radius=FILLET_8_R)

    # ｽｹｯﾁ53 → ｶｯﾄ - 押し出し28 (cut)
    with BuildSketch(Plane.XY.offset(6)):
        with BuildLine():
            Line((-55, 15), (55, 15))
            add(Edge.make_bspline(
                [(55, 15), (36.769552059, 17.647364526), (18.436218933, 18.976512989), (0, 18.976512989)],
                knots=[0, 0, 0, 0, 1, 1, 1, 1], degree=3))
            add(Edge.make_bspline(
                [(-55, 15), (-36.769552059, 17.647364526), (-18.436218933, 18.976512989), (0, 18.976512989)],
                knots=[0, 0, 0, 0, 1, 1, 1, 1], degree=3))
        make_face()
    extrude(amount=-CUT_EXTRUDE_28_DEPTH, mode=Mode.SUBTRACT)

    # ｽｹｯﾁ55 → ｶｯﾄ - 押し出し29 (cut)
    with BuildSketch(Plane(origin=(0, 0, 0), x_dir=(-1, 0, 0), z_dir=(0, 0, -1))):
        with Locations((2.421819381, 65.877084913)):
            Rectangle(SKETCH_55_W, SKETCH_55_H)
    extrude(amount=CUT_EXTRUDE_29_DEPTH, mode=Mode.SUBTRACT)

    # 面取り1
    chamfer_1_edges = [part.edges().sort_by_distance(p)[0] for p in [
        (94.5, 68, 6),
    ]]
    chamfer_1_side = [part.faces().sort_by_distance(p)[0] for p in [
        (-55.347730119, 15.238932439, 6),
    ]]
    chamfer(chamfer_1_edges, length=CHAMFER_1_SIZE, length2=CHAMFER_1_SIZE2, reference=chamfer_1_side[0])


solid = part.part
